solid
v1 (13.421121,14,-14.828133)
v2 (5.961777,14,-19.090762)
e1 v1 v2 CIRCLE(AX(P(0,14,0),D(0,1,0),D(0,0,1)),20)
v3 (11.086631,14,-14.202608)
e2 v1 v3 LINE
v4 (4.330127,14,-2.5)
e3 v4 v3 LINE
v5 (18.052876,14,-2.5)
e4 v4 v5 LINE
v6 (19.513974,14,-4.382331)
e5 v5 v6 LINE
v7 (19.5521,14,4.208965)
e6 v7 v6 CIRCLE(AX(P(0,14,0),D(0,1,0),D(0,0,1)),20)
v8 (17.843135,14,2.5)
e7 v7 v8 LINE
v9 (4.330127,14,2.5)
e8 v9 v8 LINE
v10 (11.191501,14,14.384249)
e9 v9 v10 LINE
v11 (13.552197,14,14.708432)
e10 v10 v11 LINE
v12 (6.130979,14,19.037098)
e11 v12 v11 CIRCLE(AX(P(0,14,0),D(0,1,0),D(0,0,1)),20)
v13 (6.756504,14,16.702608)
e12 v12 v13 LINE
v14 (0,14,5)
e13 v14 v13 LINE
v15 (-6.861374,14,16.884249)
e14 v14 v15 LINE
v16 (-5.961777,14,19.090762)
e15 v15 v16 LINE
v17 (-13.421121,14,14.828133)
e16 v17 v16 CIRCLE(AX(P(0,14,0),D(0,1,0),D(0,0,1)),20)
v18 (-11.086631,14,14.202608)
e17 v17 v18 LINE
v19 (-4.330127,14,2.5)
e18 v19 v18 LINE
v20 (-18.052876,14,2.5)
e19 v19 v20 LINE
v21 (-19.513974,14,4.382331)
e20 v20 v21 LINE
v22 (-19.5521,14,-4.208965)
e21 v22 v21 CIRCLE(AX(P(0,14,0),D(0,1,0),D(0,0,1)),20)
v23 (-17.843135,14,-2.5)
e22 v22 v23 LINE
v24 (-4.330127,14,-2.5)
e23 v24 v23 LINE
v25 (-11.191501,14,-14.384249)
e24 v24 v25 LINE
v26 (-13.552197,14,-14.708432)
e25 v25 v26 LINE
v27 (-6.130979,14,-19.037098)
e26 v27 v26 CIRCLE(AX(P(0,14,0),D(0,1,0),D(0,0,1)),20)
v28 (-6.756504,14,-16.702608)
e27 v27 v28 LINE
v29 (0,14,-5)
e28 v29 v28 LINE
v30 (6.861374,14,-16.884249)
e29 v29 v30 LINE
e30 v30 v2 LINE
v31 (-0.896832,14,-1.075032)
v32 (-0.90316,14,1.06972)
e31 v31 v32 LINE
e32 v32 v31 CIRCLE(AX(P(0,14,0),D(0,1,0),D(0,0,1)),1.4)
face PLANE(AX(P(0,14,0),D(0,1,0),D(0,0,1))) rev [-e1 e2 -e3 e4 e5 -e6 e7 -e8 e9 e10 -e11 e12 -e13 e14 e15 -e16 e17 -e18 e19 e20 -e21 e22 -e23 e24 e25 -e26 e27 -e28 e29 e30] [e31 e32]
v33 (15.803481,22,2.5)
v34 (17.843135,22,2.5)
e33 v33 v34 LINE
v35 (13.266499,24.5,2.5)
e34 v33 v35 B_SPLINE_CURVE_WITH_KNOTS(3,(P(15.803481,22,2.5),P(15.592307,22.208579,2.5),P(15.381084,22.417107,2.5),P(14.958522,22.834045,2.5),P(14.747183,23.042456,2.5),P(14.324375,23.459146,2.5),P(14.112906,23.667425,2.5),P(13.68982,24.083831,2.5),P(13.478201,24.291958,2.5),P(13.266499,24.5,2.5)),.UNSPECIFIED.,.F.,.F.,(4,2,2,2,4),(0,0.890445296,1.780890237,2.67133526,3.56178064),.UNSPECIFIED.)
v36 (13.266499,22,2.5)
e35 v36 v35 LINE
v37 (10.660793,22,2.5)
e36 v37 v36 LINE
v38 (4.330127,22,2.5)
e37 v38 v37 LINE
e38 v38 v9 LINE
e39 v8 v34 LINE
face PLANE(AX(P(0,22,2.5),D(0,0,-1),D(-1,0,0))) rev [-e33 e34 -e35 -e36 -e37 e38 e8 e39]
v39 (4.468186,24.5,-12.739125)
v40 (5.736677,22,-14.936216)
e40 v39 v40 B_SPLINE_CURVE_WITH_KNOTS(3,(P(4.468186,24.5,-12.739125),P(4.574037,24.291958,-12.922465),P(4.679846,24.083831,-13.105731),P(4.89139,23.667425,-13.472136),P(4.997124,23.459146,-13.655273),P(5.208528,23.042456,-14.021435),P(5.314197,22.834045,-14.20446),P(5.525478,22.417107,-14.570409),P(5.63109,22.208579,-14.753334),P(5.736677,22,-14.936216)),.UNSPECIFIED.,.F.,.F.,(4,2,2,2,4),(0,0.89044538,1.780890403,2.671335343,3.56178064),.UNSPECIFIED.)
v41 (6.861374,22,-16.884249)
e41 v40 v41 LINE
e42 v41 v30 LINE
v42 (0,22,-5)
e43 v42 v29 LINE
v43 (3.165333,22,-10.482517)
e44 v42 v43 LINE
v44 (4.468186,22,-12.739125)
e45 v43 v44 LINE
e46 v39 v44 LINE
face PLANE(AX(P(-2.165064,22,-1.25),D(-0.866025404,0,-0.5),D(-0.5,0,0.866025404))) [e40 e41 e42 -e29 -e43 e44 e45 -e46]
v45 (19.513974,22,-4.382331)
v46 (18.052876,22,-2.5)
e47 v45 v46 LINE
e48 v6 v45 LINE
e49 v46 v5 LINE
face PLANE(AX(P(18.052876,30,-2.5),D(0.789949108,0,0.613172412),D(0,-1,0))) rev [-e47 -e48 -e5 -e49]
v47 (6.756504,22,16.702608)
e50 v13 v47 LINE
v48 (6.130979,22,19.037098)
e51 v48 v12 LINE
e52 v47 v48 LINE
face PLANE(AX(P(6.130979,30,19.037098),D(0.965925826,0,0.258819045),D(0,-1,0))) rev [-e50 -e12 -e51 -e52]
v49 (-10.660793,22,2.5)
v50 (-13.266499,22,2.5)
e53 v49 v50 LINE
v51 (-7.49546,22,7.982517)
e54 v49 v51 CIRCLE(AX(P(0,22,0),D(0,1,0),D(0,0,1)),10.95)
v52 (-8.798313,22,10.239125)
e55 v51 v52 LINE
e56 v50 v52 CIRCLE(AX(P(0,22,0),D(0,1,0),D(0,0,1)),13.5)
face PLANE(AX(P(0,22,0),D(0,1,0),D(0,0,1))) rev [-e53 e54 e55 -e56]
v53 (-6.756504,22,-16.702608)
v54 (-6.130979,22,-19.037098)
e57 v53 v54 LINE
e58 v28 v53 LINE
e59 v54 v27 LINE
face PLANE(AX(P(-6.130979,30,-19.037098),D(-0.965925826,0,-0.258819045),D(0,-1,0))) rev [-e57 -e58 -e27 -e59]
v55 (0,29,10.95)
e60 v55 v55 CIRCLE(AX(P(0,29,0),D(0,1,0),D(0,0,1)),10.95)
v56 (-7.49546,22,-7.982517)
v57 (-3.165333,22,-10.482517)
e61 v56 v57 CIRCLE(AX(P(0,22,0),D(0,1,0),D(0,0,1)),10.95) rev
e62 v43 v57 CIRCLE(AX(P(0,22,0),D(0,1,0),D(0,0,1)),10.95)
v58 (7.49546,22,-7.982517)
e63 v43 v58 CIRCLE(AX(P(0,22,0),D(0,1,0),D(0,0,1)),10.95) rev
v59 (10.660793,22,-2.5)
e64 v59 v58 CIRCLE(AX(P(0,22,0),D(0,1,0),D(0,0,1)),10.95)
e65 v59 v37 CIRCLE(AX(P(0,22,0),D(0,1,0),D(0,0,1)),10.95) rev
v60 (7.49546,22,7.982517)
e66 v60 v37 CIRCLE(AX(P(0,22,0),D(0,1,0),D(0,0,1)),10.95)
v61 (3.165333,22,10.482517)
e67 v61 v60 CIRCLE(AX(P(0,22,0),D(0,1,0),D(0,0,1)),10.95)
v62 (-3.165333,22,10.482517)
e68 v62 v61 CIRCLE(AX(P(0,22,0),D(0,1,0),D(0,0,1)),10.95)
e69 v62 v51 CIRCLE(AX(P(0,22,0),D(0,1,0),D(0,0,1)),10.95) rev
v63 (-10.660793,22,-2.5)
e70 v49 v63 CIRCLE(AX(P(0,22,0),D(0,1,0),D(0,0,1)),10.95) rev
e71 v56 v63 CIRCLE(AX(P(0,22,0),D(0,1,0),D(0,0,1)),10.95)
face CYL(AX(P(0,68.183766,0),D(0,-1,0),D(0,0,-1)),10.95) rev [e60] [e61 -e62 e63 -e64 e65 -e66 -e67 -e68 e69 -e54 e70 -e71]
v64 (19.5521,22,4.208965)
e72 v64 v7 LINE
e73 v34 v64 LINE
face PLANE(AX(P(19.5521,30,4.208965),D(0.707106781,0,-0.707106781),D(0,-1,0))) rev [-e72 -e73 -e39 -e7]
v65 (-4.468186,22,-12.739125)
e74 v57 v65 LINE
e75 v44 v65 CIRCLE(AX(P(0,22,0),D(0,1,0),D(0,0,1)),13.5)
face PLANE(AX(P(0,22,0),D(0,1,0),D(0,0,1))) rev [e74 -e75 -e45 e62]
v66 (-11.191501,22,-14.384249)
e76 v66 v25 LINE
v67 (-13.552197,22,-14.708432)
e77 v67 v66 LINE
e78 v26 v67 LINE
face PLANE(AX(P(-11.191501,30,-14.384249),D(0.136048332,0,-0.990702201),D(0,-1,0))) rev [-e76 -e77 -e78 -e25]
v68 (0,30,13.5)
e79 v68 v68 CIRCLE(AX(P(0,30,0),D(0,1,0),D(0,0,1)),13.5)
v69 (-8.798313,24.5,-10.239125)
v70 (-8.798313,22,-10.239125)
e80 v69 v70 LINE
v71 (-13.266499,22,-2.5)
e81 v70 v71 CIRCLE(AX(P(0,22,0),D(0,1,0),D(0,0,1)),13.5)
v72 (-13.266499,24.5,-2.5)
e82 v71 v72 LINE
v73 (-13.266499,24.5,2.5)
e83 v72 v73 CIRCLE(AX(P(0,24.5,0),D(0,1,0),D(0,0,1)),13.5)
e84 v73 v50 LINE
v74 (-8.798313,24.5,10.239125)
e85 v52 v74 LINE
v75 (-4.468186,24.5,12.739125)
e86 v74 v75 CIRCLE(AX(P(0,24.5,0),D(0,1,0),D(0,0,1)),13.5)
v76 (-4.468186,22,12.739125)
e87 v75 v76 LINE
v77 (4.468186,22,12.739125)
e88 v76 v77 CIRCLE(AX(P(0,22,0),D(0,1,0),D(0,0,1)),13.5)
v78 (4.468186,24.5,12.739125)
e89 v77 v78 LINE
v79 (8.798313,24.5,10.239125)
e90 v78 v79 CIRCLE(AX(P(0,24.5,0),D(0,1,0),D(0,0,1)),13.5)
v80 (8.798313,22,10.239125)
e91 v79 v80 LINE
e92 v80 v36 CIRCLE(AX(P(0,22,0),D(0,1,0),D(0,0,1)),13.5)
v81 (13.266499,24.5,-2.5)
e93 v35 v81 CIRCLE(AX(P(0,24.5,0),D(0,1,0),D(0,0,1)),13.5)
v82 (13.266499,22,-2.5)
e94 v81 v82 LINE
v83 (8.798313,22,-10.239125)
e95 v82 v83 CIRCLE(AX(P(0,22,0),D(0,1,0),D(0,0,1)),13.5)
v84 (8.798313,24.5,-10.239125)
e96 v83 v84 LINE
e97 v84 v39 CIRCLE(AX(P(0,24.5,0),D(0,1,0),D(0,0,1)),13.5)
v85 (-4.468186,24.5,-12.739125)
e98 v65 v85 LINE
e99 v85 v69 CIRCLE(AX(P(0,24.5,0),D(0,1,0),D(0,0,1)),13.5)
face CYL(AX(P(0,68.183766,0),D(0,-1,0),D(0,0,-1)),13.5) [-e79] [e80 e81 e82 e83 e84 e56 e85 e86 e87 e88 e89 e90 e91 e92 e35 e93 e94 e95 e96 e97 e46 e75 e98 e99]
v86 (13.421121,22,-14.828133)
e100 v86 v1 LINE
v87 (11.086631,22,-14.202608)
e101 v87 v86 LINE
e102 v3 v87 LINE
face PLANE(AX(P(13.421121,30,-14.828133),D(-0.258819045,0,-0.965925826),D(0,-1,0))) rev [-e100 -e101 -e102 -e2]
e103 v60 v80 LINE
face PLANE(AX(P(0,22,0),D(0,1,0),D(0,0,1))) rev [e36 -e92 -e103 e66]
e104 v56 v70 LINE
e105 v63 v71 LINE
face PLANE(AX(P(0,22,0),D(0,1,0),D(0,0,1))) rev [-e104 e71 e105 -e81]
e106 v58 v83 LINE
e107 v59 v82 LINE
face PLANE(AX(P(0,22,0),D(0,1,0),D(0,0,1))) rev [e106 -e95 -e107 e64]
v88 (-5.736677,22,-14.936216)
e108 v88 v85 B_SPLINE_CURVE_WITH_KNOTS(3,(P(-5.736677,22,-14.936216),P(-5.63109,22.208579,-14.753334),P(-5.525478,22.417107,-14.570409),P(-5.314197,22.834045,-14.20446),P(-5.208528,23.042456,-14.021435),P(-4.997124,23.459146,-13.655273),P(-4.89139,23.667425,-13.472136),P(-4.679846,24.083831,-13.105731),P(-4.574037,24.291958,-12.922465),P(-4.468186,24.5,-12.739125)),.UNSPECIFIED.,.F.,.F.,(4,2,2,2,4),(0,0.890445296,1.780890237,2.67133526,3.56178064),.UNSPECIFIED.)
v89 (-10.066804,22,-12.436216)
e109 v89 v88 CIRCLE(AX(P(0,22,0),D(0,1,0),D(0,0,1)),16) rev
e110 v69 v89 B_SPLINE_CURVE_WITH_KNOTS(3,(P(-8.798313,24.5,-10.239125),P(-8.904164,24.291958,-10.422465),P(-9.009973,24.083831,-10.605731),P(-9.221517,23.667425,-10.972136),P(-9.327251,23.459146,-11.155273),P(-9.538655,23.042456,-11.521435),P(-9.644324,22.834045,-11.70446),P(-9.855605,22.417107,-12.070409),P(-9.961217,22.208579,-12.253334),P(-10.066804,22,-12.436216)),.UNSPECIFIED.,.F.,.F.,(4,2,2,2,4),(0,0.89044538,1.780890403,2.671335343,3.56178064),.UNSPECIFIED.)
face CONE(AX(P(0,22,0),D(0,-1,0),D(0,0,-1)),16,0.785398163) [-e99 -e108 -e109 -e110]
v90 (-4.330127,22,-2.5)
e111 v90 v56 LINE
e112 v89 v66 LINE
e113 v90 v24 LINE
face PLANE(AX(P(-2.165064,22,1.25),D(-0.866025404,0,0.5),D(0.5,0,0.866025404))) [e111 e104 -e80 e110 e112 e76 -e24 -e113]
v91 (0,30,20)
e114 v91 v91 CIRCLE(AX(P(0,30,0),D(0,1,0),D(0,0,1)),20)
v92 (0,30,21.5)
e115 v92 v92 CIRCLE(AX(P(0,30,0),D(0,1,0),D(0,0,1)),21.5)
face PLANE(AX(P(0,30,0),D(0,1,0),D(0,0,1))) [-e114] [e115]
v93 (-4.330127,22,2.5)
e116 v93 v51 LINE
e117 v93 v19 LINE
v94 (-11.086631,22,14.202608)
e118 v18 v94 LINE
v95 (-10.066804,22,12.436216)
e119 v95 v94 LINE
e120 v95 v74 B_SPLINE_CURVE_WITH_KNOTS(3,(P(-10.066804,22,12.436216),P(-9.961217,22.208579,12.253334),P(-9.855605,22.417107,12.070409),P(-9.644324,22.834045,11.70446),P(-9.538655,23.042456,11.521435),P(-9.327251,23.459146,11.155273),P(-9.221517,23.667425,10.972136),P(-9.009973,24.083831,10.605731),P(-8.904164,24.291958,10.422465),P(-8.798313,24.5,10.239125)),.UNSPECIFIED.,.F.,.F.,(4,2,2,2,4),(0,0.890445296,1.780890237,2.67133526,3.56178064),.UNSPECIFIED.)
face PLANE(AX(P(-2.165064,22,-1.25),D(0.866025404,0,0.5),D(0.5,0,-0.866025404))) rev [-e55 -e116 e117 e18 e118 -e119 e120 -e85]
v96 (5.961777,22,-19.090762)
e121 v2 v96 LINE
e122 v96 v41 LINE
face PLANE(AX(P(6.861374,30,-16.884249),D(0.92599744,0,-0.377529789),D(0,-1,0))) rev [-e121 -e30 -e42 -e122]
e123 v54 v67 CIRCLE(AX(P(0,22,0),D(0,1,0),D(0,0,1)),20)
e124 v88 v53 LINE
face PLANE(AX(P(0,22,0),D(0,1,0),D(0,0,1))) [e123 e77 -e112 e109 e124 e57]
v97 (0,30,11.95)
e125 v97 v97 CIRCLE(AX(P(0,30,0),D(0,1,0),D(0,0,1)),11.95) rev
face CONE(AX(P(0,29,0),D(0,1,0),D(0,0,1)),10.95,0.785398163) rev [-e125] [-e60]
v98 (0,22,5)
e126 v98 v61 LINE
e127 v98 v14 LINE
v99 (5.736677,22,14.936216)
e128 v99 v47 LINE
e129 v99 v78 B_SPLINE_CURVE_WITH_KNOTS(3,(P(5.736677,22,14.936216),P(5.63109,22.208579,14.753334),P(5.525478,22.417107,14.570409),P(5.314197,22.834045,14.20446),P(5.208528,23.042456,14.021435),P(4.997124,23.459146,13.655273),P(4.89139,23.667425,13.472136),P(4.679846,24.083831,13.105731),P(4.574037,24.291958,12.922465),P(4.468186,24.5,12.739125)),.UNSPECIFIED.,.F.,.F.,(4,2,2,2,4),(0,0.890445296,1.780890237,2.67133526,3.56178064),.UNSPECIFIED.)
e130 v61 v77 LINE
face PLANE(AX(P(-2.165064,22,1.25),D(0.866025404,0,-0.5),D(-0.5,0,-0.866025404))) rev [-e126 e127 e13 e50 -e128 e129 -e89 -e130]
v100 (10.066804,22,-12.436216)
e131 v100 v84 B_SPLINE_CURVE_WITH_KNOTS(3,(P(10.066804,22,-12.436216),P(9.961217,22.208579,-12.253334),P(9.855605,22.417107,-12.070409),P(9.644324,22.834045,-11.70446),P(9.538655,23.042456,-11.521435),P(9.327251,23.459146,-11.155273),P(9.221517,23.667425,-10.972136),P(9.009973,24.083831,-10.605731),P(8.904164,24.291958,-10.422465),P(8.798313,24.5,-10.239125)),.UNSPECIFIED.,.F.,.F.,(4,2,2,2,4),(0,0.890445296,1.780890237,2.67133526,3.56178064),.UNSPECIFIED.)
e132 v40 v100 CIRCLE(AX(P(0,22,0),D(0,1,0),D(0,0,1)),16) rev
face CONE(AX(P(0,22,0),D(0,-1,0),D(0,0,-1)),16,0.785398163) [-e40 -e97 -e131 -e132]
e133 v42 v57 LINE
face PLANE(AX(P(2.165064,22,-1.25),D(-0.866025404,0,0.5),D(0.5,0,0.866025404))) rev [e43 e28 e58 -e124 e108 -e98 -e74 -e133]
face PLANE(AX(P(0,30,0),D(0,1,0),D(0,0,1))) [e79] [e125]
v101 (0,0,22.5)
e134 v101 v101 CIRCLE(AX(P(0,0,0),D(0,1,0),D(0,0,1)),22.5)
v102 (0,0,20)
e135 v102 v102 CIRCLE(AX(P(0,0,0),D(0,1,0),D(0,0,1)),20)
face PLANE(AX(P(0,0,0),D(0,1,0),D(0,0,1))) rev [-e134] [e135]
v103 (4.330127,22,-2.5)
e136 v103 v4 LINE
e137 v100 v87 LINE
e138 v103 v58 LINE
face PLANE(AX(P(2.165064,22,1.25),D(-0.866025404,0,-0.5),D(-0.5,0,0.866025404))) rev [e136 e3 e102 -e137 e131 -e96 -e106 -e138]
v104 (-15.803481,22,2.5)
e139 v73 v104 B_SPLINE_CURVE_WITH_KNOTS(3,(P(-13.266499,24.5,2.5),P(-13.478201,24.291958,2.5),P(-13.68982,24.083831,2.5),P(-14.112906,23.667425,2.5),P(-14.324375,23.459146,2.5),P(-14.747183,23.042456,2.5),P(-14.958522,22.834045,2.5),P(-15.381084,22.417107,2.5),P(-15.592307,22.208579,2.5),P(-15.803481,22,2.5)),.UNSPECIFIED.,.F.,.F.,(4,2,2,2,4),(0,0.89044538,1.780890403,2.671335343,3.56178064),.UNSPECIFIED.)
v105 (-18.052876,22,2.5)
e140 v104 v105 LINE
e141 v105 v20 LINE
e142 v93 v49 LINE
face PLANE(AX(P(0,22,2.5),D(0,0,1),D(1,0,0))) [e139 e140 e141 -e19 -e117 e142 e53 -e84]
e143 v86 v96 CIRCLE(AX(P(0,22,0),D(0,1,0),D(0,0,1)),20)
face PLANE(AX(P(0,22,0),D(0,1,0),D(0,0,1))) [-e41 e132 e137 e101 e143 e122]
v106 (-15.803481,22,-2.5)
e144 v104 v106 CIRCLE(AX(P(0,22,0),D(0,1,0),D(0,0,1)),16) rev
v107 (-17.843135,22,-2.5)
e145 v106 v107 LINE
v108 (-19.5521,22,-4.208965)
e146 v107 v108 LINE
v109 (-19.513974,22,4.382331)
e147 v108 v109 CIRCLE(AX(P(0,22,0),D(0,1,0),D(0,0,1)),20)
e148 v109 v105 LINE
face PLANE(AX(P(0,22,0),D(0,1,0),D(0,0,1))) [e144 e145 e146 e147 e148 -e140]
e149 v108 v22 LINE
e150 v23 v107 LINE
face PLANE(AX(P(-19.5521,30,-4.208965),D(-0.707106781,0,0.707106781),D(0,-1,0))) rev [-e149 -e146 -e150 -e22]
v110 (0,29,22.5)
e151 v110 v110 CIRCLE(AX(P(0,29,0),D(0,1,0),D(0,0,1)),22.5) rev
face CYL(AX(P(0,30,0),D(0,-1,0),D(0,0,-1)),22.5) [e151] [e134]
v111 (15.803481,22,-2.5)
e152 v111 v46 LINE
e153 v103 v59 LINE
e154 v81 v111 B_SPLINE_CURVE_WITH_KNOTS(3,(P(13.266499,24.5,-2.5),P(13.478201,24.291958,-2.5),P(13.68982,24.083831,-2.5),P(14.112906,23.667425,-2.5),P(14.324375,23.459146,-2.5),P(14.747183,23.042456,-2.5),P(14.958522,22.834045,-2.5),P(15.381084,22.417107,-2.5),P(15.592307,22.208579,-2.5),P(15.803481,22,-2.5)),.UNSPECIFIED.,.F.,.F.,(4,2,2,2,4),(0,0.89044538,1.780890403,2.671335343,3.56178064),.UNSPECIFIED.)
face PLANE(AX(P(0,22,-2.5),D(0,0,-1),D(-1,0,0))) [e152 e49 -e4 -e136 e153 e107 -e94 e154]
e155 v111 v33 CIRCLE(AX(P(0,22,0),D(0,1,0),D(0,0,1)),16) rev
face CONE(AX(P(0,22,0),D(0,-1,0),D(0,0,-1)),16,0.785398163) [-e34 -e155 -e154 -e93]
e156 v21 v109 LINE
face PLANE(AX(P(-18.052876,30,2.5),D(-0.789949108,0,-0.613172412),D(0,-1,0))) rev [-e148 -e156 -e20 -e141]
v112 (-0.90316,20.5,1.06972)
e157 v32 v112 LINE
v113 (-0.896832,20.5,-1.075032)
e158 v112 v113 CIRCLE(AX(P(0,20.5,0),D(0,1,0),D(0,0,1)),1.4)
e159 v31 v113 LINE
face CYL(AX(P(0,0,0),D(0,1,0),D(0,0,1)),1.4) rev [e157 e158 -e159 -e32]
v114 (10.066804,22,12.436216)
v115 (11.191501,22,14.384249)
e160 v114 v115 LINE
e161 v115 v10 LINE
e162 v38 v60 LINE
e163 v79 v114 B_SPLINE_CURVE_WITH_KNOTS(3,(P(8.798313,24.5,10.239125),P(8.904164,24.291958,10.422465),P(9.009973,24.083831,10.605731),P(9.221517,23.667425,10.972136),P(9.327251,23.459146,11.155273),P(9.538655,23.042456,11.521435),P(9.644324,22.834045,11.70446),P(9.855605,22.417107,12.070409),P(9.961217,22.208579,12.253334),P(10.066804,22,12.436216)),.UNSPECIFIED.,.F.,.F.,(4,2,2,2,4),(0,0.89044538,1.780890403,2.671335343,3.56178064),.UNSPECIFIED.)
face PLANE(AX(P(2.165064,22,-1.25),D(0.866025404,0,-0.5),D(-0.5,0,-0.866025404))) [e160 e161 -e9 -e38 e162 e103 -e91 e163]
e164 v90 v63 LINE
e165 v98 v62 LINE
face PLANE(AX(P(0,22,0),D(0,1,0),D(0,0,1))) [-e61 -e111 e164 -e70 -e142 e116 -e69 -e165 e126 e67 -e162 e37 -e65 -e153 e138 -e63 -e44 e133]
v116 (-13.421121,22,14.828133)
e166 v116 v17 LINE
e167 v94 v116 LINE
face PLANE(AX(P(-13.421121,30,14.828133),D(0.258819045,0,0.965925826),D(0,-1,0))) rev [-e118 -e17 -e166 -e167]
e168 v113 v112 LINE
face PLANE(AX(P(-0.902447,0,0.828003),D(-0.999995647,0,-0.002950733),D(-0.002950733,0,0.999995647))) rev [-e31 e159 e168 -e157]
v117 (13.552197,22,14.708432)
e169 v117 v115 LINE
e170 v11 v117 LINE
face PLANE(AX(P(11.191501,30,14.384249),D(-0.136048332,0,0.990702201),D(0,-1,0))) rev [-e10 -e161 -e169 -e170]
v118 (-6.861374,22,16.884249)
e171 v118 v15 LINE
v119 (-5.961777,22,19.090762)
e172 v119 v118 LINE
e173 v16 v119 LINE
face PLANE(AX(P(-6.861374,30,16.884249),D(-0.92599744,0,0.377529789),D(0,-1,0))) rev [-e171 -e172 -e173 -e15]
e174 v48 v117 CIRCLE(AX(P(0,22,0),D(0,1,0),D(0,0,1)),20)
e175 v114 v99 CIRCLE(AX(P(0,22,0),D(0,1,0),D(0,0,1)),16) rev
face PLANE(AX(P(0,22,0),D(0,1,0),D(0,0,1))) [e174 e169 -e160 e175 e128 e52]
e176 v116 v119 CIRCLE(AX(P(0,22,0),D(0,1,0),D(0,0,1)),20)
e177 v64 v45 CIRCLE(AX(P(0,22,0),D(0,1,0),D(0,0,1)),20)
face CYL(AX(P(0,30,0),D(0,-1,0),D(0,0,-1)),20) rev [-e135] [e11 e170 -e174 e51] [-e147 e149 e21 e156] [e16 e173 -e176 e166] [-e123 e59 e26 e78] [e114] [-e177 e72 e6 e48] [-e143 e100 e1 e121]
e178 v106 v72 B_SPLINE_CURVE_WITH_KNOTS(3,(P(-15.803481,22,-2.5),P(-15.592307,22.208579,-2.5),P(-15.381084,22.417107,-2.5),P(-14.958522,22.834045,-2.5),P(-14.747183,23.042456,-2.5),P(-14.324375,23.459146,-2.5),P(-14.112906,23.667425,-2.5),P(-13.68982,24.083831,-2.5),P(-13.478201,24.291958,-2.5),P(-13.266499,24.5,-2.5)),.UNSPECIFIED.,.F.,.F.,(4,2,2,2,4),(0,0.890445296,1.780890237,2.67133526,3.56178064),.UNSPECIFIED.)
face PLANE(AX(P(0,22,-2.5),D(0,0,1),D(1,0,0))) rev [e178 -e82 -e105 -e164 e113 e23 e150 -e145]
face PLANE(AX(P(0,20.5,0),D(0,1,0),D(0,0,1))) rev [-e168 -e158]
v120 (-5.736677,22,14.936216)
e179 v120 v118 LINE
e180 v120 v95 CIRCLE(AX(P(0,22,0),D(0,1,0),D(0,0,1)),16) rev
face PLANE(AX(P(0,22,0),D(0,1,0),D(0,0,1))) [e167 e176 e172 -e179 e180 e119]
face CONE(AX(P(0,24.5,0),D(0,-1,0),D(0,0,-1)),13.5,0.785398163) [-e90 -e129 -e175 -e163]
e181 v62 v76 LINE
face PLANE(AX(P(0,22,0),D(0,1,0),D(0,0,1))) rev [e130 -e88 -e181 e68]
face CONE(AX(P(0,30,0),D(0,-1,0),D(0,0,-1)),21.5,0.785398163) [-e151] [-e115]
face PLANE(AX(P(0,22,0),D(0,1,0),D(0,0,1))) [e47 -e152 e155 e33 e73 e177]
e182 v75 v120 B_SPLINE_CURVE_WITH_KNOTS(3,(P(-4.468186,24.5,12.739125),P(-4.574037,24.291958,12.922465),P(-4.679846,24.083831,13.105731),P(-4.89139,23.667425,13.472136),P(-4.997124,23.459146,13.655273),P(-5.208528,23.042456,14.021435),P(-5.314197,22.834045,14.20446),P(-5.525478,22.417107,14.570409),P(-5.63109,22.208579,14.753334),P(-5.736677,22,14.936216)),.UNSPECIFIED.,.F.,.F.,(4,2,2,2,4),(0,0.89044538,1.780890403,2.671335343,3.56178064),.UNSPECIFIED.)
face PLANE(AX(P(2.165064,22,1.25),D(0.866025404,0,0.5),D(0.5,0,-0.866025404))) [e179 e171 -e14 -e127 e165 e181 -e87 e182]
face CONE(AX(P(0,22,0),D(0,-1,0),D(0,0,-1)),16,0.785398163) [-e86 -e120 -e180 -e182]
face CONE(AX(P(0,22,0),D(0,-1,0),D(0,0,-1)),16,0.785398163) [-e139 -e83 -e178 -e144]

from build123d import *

# Parameters (mm, degrees)
SKETCH1_R               = 22.5
SKETCH1_R_2             = 20
BOSS_EXTRUDE1_DEPTH     = 30
BOSS_EXTRUDE2_DEPTH     = 4
CHAMFER1_SIZE           = 2
CHAMFER1_SIZE_2         = 1.79025908
CUT_EXTRUDE1_DEPTH      = 39.684622268
CUT_EXTRUDE1_DEPTH_BACK = 39.684622268
BOSS_EXTRUDE3_START     = -1.5
BOSS_EXTRUDE3_DEPTH     = 1.5
SKETCH6_R               = 13.5
SKETCH6_R_2             = 10.95
BOSS_EXTRUDE4_DEPTH     = 8
CHAMFER2_SIZE           = 1
CHAMFER3_SIZE           = 1
CHAMFER4_SIZE           = 2.5


with BuildPart() as part:
    # Sketch1 → Boss-Extrude1 (new body)
    with BuildSketch(Plane(origin=(0, 0, 0), x_dir=(1, 0, 0), z_dir=(0, 1, 0))):
        with Locations(Location((0, 0, 0), (0, 0, 270))):
            Circle(SKETCH1_R)
        with Locations(Location((0, 0, 0), (0, 0, 270))):
            Circle(SKETCH1_R_2, mode=Mode.SUBTRACT)
    extrude(amount=BOSS_EXTRUDE1_DEPTH)

    # Sketch2 → Boss-Extrude2 (add, symmetric)
    with BuildSketch(Plane(origin=(0, 18, 0), x_dir=(1, 0, 0), z_dir=(0, 1, 0))):
        with BuildLine():
            Line((-12.086630926, 15.934658856), (-4.330127019, 2.5))
            Line((-4.330127019, 2.5), (-19.843134833, 2.5))
            ThreePointArc((-19.843134833, 2.5), (-20, 0), (-19.843134833, -2.5))
            Line((-19.843134833, -2.5), (-4.330127019, -2.5))
            Line((-4.330127019, -2.5), (-12.086630926, -15.934658856))
            ThreePointArc((-12.086630926, -15.934658856), (-10, -17.320508076), (-7.756503907, -18.434658856))
            Line((-7.756503907, -18.434658856), (0, -5))
            Line((0, -5), (7.756503907, -18.434658856))
            ThreePointArc((7.756503907, -18.434658856), (10, -17.320508076), (12.086630926, -15.934658856))
            Line((12.086630926, -15.934658856), (4.330127019, -2.5))
            Line((4.330127019, -2.5), (19.843134833, -2.5))
            ThreePointArc((19.843134833, -2.5), (19.960745185, -1.252458251), (20, 0))
            ThreePointArc((20, 0), (19.960745185, 1.252458251), (19.843134833, 2.5))
            Line((19.843134833, 2.5), (4.330127019, 2.5))
            Line((4.330127019, 2.5), (12.086630926, 15.934658856))
            ThreePointArc((12.086630926, 15.934658856), (10, 17.320508076), (7.756503907, 18.434658856))
            Line((7.756503907, 18.434658856), (0, 5))
            Line((0, 5), (-7.756503907, 18.434658856))
            ThreePointArc((-7.756503907, 18.434658856), (-10, 17.320508076), (-12.086630926, 15.934658856))
        make_face()
    extrude(amount=BOSS_EXTRUDE2_DEPTH, both=True)

    # Chamfer1
    # the kernel refuses this chamfer: 2, 1.79025908 mm, written as the material it adds along each edge
    with BuildSketch(Plane(origin=(7.756503907, 22, 18.434658856), x_dir=(-0.9376749432180777, 0, 0.34751359809505994), z_dir=(0, -1, 0)), Plane(origin=(19.843134833, 22, 2.5), x_dir=(-0.16788186749818226, 0, 0.9858071203665161), z_dir=(0, -1, 0)), Plane(origin=(12.086630926, 22, -15.934658856), x_dir=(0.7697930757198956, 0, 0.6382935222714571), z_dir=(0, -1, 0)), Plane(origin=(-7.756503907, 22, -18.434658856), x_dir=(0.9376749432180783, 0, -0.34751359809505833), z_dir=(0, -1, 0)), Plane(origin=(-19.843134833, 22, -2.5), x_dir=(0.1678818674981782, 0, -0.9858071203665167), z_dir=(0, -1, 0)), Plane(origin=(-12.086630926, 22, 15.934658856), x_dir=(-0.7697930757198955, 0, -0.6382935222714572), z_dir=(0, -1, 0))) as chamfer1_piece_1:
        with BuildLine():
            Line((1.733569464, 0), (CHAMFER1_SIZE * 0.167881867498, CHAMFER1_SIZE * 0.985807120367))
            Line((CHAMFER1_SIZE * 0.167881867498, CHAMFER1_SIZE * 0.985807120367), (0, 0))
            ThreePointArc((0, 0), (0.889903139, -0.018778361), (1.733569464, 0))
        make_face()
    extrude(amount=8)
    with BuildSketch(Plane(origin=(12.086630926, 14, 15.934658856), x_dir=(0.7669529363679002, 0, -0.6417033531131466), z_dir=(0, 1, 0)), Plane(origin=(19.843134833, 14, -2.5), x_dir=(-0.17225493730569186, 0, -0.9850524029582447), z_dir=(0, 1, 0)), Plane(origin=(7.756503907, 14, -18.434658856), x_dir=(-0.9392078736735914, 0, -0.3433490498450975), z_dir=(0, 1, 0)), Plane(origin=(-12.086630926, 14, -15.934658856), x_dir=(-0.766952936367899, 0, 0.641703353113148), z_dir=(0, 1, 0)), Plane(origin=(-19.843134833, 14, 2.5), x_dir=(0.17225493730568892, 0, 0.9850524029582453), z_dir=(0, 1, 0)), Plane(origin=(-7.756503907, 14, 18.434658856), x_dir=(0.9392078736735913, 0, 0.3433490498450977), z_dir=(0, 1, 0))) as chamfer1_piece_2:
        with BuildLine():
            Line((1.910893878, 0), (CHAMFER1_SIZE_2 * 0.172254937261, CHAMFER1_SIZE_2 * 0.985052402702))
            Line((CHAMFER1_SIZE_2 * 0.172254937261, CHAMFER1_SIZE_2 * 0.985052402702), (0, 0))
            ThreePointArc((0, 0), (0.982338586, -0.022816928), (1.910893878, 0))
        make_face()
    extrude(amount=8)

    # Sketch4 → Cut-Extrude1 (cut, two sides: drawn at the far end of the back side and taken through both)
    with BuildSketch(Plane(origin=(0, 22, 0), x_dir=(1, 0, 0), z_dir=(0, 1, 0)).offset(-CUT_EXTRUDE1_DEPTH_BACK)):
        with BuildLine():
            Line((-0.896831774, 1.07503152), (-0.897545019, 0.833314429))
            Line((-0.897545019, 0.833314429), (-0.902447145, -0.828003111))
            Line((-0.902447145, -0.828003111), (-0.90316039, -1.069720202))
            ThreePointArc((-0.90316039, -1.069720202), (1.399993905, -0.004131026), (-0.896831774, 1.07503152))
        make_face()
    extrude(amount=CUT_EXTRUDE1_DEPTH + CUT_EXTRUDE1_DEPTH_BACK, mode=Mode.SUBTRACT)

    # Sketch5 → Boss-Extrude3 (add)
    with BuildSketch(Plane(origin=(0, 22, 0), x_dir=(1, 0, 0), z_dir=(0, 1, 0)).offset(BOSS_EXTRUDE3_START)):
        with BuildLine():
            Line((-0.896831774, 1.07503152), (-0.90316039, -1.069720202))
            ThreePointArc((-0.90316039, -1.069720202), (1.399993905, -0.004131026), (-0.896831774, 1.07503152))
        make_face()
    extrude(amount=BOSS_EXTRUDE3_DEPTH)

    # Sketch6 → Boss-Extrude4 (add)
    with BuildSketch(Plane(origin=(0, 22, 0), x_dir=(1, 0, 0), z_dir=(0, 1, 0))):
        with Locations(Location((0, 0, 0), (0, 0, 109.328070714))):
            Circle(SKETCH6_R)
        with Locations(Location((0, 0, 0), (0, 0, 106.802375663))):
            Circle(SKETCH6_R_2, mode=Mode.SUBTRACT)
    extrude(amount=BOSS_EXTRUDE4_DEPTH)

    # Chamfer2
    chamfer2_edges = [part.edges().sort_by_distance(p)[0] for p in [
        (0, 30, -22.5),
    ]]
    chamfer(chamfer2_edges, length=CHAMFER2_SIZE)

    # Chamfer3
    chamfer3_edges = [part.edges().sort_by_distance(p)[0] for p in [
        (3.165332817, 30, 10.482517262),
    ]]
    chamfer(chamfer3_edges, length=CHAMFER3_SIZE)

    # Chamfer4
    # the kernel refuses this chamfer: 2.5 mm, written as the material it adds along each edge
    with BuildSketch(Plane(origin=(0, 22, 0), x_dir=(0.7884516512749685, 0, 0.6150967351577924), z_dir=(-0.6150967351577924, 0, 0.7884516512749685))) as chamfer4_piece_1_section:
        Polygon((13.5, CHAMFER4_SIZE), (13.5 + CHAMFER4_SIZE, 0), (13.5, 0), align=None)
    chamfer4_piece_1 = revolve(axis=Axis((0, 22, 0), (0, 1, 0)), revolution_arc=75.917899148, mode=Mode.PRIVATE)
    chamfer4_piece_1 = split(chamfer4_piece_1, bisect_by=Plane(origin=(0, 22, 2.5), z_dir=(0, 0, -1)), keep=Keep.TOP, mode=Mode.PRIVATE)
    chamfer4_piece_1 = split(chamfer4_piece_1, bisect_by=Plane(origin=(0, 22, -2.5), z_dir=(0, 0, 1)), keep=Keep.TOP, mode=Mode.PRIVATE)
    add(chamfer4_piece_1)
    with BuildSketch(Plane(origin=(0, 22, 0), x_dir=(0.9269152240690147, 0, -0.3752707920809829), z_dir=(0.3752707920809829, 0, 0.9269152240690147))) as chamfer4_piece_2_section:
        Polygon((13.5, CHAMFER4_SIZE), (13.5 + CHAMFER4_SIZE, 0), (13.5, 0), align=None)
    chamfer4_piece_2 = revolve(axis=Axis((0, 22, 0), (0, 1, 0)), revolution_arc=75.917899148, mode=Mode.PRIVATE)
    chamfer4_piece_2 = split(chamfer4_piece_2, bisect_by=Plane(origin=(2.165063509, 22, 1.25), z_dir=(-0.8660254037844385, 0, -0.5000000000000003)), keep=Keep.TOP, mode=Mode.PRIVATE)
    chamfer4_piece_2 = split(chamfer4_piece_2, bisect_by=Plane(origin=(-2.165063509, 22, -1.25), z_dir=(0.8660254037844383, 0, 0.5000000000000009)), keep=Keep.TOP, mode=Mode.PRIVATE)
    add(chamfer4_piece_2)
    with BuildSketch(Plane(origin=(0, 22, 0), x_dir=(0.138463572798161, 0, -0.9903675272382311), z_dir=(0.9903675272382311, 0, 0.138463572798161))) as chamfer4_piece_3_section:
        Polygon((13.5, CHAMFER4_SIZE), (13.5 + CHAMFER4_SIZE, 0), (13.5, 0), align=None)
    chamfer4_piece_3 = revolve(axis=Axis((0, 22, 0), (0, 1, 0)), revolution_arc=75.917899148, mode=Mode.PRIVATE)
    chamfer4_piece_3 = split(chamfer4_piece_3, bisect_by=Plane(origin=(-2.165063509, 22, 1.25), z_dir=(0.8660254037844393, 0, -0.49999999999999906)), keep=Keep.TOP, mode=Mode.PRIVATE)
    chamfer4_piece_3 = split(chamfer4_piece_3, bisect_by=Plane(origin=(2.165063509, 22, -1.25), z_dir=(-0.8660254037844392, 0, 0.49999999999999917)), keep=Keep.TOP, mode=Mode.PRIVATE)
    add(chamfer4_piece_3)
    with BuildSketch(Plane(origin=(0, 22, 0), x_dir=(-0.788451651274934, 0, -0.6150967351578366), z_dir=(0.6150967351578366, 0, -0.788451651274934))) as chamfer4_piece_4_section:
        Polygon((13.5, CHAMFER4_SIZE), (13.5 + CHAMFER4_SIZE, 0), (13.5, 0), align=None)
    chamfer4_piece_4 = revolve(axis=Axis((0, 22, 0), (0, 1, 0)), revolution_arc=75.917899148, mode=Mode.PRIVATE)
    chamfer4_piece_4 = split(chamfer4_piece_4, bisect_by=Plane(origin=(0, 22, -2.5), z_dir=(0, 0, 1)), keep=Keep.TOP, mode=Mode.PRIVATE)
    chamfer4_piece_4 = split(chamfer4_piece_4, bisect_by=Plane(origin=(0, 22, 2.5), z_dir=(0, 0, -1)), keep=Keep.TOP, mode=Mode.PRIVATE)
    add(chamfer4_piece_4)
    with BuildSketch(Plane(origin=(0, 22, 0), x_dir=(-0.9269152240690146, 0, 0.375270792080983), z_dir=(-0.375270792080983, 0, -0.9269152240690146))) as chamfer4_piece_5_section:
        Polygon((13.5, CHAMFER4_SIZE), (13.5 + CHAMFER4_SIZE, 0), (13.5, 0), align=None)
    chamfer4_piece_5 = revolve(axis=Axis((0, 22, 0), (0, 1, 0)), revolution_arc=75.917899148, mode=Mode.PRIVATE)
    chamfer4_piece_5 = split(chamfer4_piece_5, bisect_by=Plane(origin=(-2.165063509, 22, -1.25), z_dir=(0.8660254037844384, 0, 0.5000000000000006)), keep=Keep.TOP, mode=Mode.PRIVATE)
    chamfer4_piece_5 = split(chamfer4_piece_5, bisect_by=Plane(origin=(2.165063509, 22, 1.25), z_dir=(-0.8660254037844386, 0, -0.5000000000000003)), keep=Keep.TOP, mode=Mode.PRIVATE)
    add(chamfer4_piece_5)
    with BuildSketch(Plane(origin=(0, 22, 0), x_dir=(-0.13846357279405325, 0, 0.9903675272388054), z_dir=(-0.9903675272388054, 0, -0.13846357279405325))) as chamfer4_piece_6_section:
        Polygon((13.5, CHAMFER4_SIZE), (13.5 + CHAMFER4_SIZE, 0), (13.5, 0), align=None)
    chamfer4_piece_6 = revolve(axis=Axis((0, 22, 0), (0, 1, 0)), revolution_arc=75.917899148, mode=Mode.PRIVATE)
    chamfer4_piece_6 = split(chamfer4_piece_6, bisect_by=Plane(origin=(-2.165063509, 22, 1.25), z_dir=(0.8660254037844392, 0, -0.4999999999999992)), keep=Keep.TOP, mode=Mode.PRIVATE)
    chamfer4_piece_6 = split(chamfer4_piece_6, bisect_by=Plane(origin=(2.165063509, 22, -1.25), z_dir=(-0.866025403784439, 0, 0.4999999999999993)), keep=Keep.TOP, mode=Mode.PRIVATE)
    add(chamfer4_piece_6)


solid = part.part
